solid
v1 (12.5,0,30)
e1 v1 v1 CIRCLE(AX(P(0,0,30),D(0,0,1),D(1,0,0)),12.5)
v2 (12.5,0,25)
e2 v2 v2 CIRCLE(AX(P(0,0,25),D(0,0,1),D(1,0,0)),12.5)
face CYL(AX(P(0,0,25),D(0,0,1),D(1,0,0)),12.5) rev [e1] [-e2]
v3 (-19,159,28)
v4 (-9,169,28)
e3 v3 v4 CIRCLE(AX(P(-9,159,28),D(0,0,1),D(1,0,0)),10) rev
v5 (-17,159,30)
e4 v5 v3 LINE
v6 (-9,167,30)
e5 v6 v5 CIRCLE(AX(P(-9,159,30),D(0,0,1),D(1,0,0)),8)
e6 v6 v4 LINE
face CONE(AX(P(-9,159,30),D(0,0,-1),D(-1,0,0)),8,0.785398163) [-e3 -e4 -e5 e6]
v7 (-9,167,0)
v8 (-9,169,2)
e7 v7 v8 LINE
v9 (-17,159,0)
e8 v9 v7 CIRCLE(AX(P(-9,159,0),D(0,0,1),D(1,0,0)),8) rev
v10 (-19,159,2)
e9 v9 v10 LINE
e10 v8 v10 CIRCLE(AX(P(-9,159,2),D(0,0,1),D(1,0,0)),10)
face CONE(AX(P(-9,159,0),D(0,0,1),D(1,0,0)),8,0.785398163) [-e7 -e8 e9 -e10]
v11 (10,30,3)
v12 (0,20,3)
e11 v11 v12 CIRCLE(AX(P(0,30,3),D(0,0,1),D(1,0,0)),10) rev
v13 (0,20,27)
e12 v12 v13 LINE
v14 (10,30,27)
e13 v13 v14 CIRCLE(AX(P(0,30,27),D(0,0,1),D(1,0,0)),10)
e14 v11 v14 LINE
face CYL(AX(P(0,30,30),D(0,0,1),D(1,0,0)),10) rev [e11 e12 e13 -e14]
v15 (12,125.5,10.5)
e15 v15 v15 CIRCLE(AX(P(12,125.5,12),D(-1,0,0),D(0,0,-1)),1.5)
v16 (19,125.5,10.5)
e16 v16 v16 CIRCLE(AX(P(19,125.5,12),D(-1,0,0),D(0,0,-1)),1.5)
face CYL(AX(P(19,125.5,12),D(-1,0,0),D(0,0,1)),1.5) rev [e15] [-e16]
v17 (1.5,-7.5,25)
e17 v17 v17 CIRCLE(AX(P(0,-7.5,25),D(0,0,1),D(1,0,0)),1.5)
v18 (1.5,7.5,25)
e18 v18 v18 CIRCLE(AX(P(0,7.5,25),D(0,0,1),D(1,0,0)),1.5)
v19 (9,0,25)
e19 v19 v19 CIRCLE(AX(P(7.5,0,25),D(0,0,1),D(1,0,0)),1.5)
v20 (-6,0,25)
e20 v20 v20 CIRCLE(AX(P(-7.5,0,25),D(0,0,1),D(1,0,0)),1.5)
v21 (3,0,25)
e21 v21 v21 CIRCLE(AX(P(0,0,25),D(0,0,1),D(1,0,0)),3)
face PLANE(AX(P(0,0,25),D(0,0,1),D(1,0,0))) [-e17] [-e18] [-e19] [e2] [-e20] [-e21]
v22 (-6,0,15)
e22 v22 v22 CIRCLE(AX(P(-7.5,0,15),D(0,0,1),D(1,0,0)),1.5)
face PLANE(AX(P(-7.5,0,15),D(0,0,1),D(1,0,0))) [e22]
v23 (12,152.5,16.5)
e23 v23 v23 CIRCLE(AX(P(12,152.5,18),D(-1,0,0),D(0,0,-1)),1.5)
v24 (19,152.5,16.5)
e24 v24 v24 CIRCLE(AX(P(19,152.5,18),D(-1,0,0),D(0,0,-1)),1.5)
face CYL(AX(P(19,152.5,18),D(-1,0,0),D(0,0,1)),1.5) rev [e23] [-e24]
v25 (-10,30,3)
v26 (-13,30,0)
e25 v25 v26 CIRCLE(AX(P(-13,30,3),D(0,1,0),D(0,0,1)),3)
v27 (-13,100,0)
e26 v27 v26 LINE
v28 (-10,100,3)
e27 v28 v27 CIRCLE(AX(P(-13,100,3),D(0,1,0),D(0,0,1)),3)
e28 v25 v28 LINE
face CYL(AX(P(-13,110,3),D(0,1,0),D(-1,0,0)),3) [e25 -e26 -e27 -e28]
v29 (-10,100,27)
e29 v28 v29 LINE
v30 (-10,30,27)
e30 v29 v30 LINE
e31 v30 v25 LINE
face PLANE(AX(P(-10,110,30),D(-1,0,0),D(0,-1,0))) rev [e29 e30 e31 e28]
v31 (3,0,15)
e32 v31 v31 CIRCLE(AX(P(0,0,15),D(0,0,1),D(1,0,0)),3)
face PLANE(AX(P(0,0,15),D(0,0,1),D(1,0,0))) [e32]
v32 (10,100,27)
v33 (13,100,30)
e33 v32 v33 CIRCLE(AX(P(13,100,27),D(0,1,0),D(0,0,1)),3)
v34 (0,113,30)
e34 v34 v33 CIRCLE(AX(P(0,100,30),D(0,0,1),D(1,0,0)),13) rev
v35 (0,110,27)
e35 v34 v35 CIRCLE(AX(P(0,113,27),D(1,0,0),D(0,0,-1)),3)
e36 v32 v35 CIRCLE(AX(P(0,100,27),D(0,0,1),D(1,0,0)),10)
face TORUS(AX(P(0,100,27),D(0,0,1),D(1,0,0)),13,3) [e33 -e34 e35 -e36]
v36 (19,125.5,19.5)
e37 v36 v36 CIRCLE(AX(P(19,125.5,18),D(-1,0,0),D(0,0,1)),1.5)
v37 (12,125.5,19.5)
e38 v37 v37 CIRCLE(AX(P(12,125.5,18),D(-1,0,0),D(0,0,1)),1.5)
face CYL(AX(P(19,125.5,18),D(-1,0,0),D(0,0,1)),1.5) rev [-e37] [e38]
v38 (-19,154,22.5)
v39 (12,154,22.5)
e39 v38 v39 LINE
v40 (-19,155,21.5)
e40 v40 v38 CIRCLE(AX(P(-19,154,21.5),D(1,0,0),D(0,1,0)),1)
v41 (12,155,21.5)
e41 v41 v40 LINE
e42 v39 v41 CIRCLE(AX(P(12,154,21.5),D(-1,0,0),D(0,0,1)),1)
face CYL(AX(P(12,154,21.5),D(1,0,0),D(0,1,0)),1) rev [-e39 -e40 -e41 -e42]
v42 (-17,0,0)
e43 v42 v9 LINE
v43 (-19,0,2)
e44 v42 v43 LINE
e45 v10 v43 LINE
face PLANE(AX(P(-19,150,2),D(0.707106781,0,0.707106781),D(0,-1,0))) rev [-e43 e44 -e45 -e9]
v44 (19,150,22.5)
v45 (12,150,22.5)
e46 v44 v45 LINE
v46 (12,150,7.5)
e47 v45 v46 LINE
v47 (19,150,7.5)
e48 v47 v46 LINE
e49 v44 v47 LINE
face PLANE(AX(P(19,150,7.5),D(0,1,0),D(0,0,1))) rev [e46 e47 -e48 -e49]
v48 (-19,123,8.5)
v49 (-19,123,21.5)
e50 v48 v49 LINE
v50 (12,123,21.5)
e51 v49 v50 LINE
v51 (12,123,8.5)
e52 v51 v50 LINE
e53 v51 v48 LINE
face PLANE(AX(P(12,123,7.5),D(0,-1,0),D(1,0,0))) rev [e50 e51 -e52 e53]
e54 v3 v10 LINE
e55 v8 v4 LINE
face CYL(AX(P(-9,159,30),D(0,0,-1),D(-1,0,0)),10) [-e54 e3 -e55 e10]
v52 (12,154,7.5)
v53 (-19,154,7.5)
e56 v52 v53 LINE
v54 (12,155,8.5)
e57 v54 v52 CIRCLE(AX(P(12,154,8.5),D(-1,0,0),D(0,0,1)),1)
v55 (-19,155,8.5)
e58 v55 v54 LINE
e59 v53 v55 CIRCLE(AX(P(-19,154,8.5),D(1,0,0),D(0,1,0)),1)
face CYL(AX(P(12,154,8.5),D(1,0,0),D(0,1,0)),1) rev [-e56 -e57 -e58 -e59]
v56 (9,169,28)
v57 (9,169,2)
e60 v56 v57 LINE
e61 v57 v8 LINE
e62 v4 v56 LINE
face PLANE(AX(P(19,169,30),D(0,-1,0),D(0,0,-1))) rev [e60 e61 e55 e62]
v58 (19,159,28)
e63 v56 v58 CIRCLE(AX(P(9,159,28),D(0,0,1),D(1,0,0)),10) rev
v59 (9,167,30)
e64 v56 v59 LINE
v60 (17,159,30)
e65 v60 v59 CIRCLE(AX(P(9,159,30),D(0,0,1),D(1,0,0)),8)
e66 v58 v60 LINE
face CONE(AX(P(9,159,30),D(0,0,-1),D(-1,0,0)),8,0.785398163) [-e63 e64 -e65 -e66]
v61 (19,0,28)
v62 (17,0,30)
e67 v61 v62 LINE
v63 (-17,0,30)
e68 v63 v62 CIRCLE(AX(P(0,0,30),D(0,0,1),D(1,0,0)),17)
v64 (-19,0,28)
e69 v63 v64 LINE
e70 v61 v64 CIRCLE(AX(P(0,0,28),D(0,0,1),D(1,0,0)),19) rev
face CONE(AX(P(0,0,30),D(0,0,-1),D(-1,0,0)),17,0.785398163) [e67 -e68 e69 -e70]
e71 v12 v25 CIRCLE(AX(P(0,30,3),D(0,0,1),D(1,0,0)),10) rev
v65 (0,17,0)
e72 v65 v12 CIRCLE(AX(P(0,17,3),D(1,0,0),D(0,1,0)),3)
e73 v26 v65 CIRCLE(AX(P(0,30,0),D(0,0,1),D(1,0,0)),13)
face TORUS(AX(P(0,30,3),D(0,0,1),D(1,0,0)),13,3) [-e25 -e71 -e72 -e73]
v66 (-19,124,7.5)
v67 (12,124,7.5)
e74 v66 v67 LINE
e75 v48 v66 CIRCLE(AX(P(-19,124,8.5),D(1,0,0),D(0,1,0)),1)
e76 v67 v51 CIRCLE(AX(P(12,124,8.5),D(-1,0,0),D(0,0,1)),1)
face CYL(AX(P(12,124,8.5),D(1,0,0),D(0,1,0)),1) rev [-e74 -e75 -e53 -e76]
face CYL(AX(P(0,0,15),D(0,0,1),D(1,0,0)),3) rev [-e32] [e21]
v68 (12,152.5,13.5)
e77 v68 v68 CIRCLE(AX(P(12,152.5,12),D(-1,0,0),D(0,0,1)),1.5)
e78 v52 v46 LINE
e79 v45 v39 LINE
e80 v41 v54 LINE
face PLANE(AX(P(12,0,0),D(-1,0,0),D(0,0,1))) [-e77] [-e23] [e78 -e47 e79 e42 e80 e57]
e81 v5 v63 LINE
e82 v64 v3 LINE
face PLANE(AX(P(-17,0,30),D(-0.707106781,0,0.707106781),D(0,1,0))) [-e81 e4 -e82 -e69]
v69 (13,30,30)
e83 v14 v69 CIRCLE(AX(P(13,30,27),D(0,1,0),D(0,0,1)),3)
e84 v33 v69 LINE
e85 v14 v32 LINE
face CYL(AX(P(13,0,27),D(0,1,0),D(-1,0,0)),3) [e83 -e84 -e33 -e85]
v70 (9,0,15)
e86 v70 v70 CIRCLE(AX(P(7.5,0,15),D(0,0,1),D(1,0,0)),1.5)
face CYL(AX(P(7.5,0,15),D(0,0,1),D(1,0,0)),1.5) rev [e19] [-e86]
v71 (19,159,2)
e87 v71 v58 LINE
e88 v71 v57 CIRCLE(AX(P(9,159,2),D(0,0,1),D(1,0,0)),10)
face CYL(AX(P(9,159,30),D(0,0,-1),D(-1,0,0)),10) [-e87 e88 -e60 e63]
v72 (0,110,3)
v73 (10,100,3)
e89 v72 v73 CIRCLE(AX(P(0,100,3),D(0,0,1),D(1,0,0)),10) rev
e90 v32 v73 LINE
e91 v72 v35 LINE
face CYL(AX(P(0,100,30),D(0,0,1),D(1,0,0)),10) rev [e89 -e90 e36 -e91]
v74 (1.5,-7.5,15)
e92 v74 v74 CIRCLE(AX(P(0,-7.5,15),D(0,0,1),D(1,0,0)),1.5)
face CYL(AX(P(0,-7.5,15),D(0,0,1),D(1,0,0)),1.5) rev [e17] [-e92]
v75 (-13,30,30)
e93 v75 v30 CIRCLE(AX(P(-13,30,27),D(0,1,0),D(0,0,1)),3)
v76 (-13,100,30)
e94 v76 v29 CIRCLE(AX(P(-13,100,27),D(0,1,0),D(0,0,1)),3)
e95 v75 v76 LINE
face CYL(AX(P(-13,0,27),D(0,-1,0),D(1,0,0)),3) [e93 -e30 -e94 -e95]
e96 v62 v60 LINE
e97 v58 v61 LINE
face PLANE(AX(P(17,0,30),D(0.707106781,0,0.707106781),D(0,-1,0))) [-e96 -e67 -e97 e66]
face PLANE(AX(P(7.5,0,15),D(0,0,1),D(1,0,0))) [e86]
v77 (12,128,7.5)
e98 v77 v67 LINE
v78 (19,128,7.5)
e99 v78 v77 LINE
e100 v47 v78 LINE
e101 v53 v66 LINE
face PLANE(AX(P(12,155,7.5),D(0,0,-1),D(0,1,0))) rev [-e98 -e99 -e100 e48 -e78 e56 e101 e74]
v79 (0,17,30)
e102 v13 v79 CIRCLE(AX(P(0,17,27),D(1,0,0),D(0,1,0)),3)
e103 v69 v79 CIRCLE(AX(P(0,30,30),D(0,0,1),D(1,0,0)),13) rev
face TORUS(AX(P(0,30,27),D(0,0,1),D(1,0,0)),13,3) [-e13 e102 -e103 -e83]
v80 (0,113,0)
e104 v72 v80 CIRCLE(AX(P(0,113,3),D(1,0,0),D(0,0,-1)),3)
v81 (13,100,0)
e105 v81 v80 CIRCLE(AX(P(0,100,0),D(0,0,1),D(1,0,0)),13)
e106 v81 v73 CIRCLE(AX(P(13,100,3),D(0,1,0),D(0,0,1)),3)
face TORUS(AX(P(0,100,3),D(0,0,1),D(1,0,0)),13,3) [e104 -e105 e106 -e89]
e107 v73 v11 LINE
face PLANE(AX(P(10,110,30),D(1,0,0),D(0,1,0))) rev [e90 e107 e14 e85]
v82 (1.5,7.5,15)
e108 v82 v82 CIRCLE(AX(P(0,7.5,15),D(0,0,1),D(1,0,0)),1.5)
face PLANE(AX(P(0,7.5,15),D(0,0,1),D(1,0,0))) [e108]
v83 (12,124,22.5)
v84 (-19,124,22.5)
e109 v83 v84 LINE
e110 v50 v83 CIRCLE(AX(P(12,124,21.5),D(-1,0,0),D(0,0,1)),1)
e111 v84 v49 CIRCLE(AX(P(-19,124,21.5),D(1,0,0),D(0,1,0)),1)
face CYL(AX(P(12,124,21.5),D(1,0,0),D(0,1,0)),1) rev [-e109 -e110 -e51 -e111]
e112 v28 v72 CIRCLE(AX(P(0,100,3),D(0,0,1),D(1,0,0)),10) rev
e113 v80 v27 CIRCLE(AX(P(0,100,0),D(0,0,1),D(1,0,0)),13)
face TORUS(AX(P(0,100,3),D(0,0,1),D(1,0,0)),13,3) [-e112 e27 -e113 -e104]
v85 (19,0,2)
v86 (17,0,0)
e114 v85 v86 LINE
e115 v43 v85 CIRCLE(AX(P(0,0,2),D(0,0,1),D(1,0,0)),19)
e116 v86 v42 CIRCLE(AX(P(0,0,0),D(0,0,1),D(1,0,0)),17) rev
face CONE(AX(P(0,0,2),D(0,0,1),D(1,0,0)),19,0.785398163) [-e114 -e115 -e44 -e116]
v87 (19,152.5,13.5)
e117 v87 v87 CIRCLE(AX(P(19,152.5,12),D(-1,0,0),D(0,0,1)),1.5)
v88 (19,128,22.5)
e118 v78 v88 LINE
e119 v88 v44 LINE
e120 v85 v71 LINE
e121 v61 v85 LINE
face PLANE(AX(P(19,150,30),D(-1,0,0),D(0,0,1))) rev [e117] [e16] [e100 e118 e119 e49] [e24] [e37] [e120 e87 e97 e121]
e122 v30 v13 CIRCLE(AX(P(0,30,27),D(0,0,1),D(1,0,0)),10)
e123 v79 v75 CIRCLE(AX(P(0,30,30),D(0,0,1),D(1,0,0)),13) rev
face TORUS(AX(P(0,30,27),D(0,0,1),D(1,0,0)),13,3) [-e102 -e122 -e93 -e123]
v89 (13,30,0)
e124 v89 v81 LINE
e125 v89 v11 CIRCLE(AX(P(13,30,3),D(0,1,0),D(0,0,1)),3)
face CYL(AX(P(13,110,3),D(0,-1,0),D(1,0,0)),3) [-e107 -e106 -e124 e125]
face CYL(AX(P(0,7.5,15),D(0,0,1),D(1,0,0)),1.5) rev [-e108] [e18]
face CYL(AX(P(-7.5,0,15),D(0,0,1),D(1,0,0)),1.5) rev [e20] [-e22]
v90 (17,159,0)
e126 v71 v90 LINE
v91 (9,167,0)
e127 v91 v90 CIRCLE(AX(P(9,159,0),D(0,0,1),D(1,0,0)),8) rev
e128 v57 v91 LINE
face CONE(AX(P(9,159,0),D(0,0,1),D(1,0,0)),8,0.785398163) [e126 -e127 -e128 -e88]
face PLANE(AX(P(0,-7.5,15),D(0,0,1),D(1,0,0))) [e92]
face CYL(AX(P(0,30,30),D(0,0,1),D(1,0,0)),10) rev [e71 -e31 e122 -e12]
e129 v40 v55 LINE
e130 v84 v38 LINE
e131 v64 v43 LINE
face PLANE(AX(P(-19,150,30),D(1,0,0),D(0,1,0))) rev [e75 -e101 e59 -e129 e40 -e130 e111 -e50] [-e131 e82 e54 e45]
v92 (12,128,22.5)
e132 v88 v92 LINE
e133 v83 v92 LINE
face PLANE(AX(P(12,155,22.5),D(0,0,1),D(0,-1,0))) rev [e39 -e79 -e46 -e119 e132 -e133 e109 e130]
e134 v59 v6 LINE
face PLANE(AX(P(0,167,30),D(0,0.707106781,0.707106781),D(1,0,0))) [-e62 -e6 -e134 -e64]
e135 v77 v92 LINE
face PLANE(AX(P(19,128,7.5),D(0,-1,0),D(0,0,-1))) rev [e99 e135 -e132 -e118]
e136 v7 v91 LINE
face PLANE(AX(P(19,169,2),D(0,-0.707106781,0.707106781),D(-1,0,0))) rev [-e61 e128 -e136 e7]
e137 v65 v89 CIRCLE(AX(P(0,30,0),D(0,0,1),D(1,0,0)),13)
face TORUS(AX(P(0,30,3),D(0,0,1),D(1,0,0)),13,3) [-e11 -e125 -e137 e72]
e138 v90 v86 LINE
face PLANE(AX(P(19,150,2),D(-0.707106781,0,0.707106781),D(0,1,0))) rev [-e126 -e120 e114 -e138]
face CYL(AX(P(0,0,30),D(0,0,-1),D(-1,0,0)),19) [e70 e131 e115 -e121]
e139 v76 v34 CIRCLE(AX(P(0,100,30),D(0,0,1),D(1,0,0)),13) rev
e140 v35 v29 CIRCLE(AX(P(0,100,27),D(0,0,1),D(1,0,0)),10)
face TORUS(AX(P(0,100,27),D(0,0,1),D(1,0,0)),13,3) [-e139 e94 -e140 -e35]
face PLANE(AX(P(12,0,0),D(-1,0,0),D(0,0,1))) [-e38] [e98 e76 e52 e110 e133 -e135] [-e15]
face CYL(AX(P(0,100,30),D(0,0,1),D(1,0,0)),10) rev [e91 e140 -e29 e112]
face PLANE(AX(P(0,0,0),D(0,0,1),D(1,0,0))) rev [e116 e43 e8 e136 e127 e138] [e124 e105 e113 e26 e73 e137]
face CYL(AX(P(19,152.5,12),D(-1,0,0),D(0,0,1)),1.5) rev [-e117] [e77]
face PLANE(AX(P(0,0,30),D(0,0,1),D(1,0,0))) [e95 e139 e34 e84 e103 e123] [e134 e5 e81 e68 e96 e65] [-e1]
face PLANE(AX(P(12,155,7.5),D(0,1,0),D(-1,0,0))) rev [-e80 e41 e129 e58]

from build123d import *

# Parameters (mm, degrees)
BOSS_EXTRUDE1_DEPTH = 30
SKETCH2_R           = 12.5
CUT_EXTRUDE1_DEPTH  = 5
SKETCH3_R           = 3
SKETCH3_R_2         = 1.5
CUT_EXTRUDE3_DEPTH  = 10
SKETCH5_W           = 15
SKETCH5_H           = 32
CUT_EXTRUDE4_DEPTH  = 31
SKETCH6_R           = 1.5
SKETCH6_W           = 15
SKETCH6_H           = 22
CUT_EXTRUDE5_DEPTH  = 175.419035658
FILLET2_R           = 10
CHAMFER2_SIZE       = 2
SKETCH7_W           = 20
SKETCH7_H           = 90
CUT_EXTRUDE6_DEPTH  = 173.690474549
FILLET3_R           = 10
FILLET4_R           = 1
FILLET5_R           = 3


with BuildPart() as part:
    # Sketch1 → Boss-Extrude1 (new body)
    with BuildSketch(Plane.XY):
        with BuildLine():
            Line((19, 150), (19, 0))
            ThreePointArc((19, 0), (0, -19), (-19, 0))
            Line((-19, 0), (-19, 150))
            Line((-19, 150), (-19, 169))
            Line((-19, 169), (19, 169))
            Line((19, 169), (19, 150))
        make_face()
    extrude(amount=BOSS_EXTRUDE1_DEPTH)

    # Sketch2 → Cut-Extrude1 (cut)
    with BuildSketch(Plane.XY.offset(30)):
        Circle(SKETCH2_R)
    extrude(amount=-CUT_EXTRUDE1_DEPTH, mode=Mode.SUBTRACT)

    # Sketch3 → Cut-Extrude3 (cut)
    with BuildSketch(Plane.XY.offset(25)):
        Circle(SKETCH3_R)
        with Locations((0, 7.5)):
            Circle(SKETCH3_R_2)
        with Locations((7.5, 0)):
            Circle(SKETCH3_R_2)
        with Locations((0, -7.5)):
            Circle(SKETCH3_R_2)
        with Locations((-7.5, 0)):
            Circle(SKETCH3_R_2)
    extrude(amount=-CUT_EXTRUDE3_DEPTH, mode=Mode.SUBTRACT)

    # Sketch5 → Cut-Extrude4 (cut)
    with BuildSketch(Plane.ZY.offset(19)):
        with Locations((15, 139)):
            Rectangle(SKETCH5_W, SKETCH5_H)
    extrude(amount=-CUT_EXTRUDE4_DEPTH, mode=Mode.SUBTRACT)

    # Sketch6 → Cut-Extrude5 (cut, through all)
    with BuildSketch(Plane.ZY.offset(-12)):
        with Locations((12, 152.5)):
            Circle(SKETCH6_R)
        with Locations(Location((18, 152.5, 0), (0, 0, 180))):
            Circle(SKETCH6_R)
        with Locations((18, 125.5)):
            Circle(SKETCH6_R)
        with Locations(Location((12, 125.5, 0), (0, 0, 180))):
            Circle(SKETCH6_R)
        with Locations((15, 139)):
            Rectangle(SKETCH6_W, SKETCH6_H)
    extrude(amount=-CUT_EXTRUDE5_DEPTH, mode=Mode.SUBTRACT)

    # Fillet2
    fillet2_edges = [part.edges().sort_by_distance(p)[0] for p in [
        (-19, 169, 15),
        (19, 169, 15),
    ]]
    fillet(fillet2_edges, radius=FILLET2_R)

    # Chamfer2
    chamfer2_edges = [part.edges().sort_by_distance(p)[0] for p in [
        (16.071067812, 166.071067812, 30),
        (0, -19, 30),
        (19, 79.5, 30),
        (19, 79.5, 0),
        (0, -19, 0),
        (0, 169, 0),
        (0, 169, 30),
        (-19, 79.5, 0),
        (-16.071067812, 166.071067812, 0),
        (16.071067812, 166.071067812, 0),
        (-19, 79.5, 30),
        (-16.071067812, 166.071067812, 30),
    ]]
    chamfer(chamfer2_edges, length=CHAMFER2_SIZE)

    # Sketch7 → Cut-Extrude6 (cut, through all)
    with BuildSketch(Plane(origin=(0, 0, 0), x_dir=(-1, 0, 0), z_dir=(0, 0, -1))):
        with Locations((0, 65)):
            Rectangle(SKETCH7_W, SKETCH7_H)
    extrude(amount=-CUT_EXTRUDE6_DEPTH, mode=Mode.SUBTRACT)

    # Fillet3
    fillet3_edges = [part.edges().sort_by_distance(p)[0] for p in [
        (-10, 110, 15),
        (10, 20, 15),
        (-10, 20, 15),
        (10, 110, 15),
    ]]
    fillet(fillet3_edges, radius=FILLET3_R - 0.0001)  # a hair under: the kernel refuses the full size

    # Fillet4
    fillet4_edges = [part.edges().sort_by_distance(p)[0] for p in [
        (-3.5, 155, 22.5),
        (-3.5, 123, 22.5),
        (-3.5, 123, 7.5),
        (-3.5, 155, 7.5),
    ]]
    fillet(fillet4_edges, radius=FILLET4_R)

    # Fillet5
    fillet5_edges = [part.edges().sort_by_distance(p)[0] for p in [
        (-10, 65, 0),
        (-10, 65, 30),
        (10, 65, 0),
        (10, 65, 30),
        (-7.071097101, 107.071097101, 0),
        (-7.071097101, 107.071097101, 30),
        (7.071097101, 22.928902899, 0),
        (7.071097101, 22.928902899, 30),
        (-7.071097101, 22.928902899, 0),
        (-7.071097101, 22.928902899, 30),
        (7.071097101, 107.071097101, 0),
        (7.071097101, 107.071097101, 30),
    ]]
    fillet(fillet5_edges, radius=FILLET5_R)


solid = part.part
